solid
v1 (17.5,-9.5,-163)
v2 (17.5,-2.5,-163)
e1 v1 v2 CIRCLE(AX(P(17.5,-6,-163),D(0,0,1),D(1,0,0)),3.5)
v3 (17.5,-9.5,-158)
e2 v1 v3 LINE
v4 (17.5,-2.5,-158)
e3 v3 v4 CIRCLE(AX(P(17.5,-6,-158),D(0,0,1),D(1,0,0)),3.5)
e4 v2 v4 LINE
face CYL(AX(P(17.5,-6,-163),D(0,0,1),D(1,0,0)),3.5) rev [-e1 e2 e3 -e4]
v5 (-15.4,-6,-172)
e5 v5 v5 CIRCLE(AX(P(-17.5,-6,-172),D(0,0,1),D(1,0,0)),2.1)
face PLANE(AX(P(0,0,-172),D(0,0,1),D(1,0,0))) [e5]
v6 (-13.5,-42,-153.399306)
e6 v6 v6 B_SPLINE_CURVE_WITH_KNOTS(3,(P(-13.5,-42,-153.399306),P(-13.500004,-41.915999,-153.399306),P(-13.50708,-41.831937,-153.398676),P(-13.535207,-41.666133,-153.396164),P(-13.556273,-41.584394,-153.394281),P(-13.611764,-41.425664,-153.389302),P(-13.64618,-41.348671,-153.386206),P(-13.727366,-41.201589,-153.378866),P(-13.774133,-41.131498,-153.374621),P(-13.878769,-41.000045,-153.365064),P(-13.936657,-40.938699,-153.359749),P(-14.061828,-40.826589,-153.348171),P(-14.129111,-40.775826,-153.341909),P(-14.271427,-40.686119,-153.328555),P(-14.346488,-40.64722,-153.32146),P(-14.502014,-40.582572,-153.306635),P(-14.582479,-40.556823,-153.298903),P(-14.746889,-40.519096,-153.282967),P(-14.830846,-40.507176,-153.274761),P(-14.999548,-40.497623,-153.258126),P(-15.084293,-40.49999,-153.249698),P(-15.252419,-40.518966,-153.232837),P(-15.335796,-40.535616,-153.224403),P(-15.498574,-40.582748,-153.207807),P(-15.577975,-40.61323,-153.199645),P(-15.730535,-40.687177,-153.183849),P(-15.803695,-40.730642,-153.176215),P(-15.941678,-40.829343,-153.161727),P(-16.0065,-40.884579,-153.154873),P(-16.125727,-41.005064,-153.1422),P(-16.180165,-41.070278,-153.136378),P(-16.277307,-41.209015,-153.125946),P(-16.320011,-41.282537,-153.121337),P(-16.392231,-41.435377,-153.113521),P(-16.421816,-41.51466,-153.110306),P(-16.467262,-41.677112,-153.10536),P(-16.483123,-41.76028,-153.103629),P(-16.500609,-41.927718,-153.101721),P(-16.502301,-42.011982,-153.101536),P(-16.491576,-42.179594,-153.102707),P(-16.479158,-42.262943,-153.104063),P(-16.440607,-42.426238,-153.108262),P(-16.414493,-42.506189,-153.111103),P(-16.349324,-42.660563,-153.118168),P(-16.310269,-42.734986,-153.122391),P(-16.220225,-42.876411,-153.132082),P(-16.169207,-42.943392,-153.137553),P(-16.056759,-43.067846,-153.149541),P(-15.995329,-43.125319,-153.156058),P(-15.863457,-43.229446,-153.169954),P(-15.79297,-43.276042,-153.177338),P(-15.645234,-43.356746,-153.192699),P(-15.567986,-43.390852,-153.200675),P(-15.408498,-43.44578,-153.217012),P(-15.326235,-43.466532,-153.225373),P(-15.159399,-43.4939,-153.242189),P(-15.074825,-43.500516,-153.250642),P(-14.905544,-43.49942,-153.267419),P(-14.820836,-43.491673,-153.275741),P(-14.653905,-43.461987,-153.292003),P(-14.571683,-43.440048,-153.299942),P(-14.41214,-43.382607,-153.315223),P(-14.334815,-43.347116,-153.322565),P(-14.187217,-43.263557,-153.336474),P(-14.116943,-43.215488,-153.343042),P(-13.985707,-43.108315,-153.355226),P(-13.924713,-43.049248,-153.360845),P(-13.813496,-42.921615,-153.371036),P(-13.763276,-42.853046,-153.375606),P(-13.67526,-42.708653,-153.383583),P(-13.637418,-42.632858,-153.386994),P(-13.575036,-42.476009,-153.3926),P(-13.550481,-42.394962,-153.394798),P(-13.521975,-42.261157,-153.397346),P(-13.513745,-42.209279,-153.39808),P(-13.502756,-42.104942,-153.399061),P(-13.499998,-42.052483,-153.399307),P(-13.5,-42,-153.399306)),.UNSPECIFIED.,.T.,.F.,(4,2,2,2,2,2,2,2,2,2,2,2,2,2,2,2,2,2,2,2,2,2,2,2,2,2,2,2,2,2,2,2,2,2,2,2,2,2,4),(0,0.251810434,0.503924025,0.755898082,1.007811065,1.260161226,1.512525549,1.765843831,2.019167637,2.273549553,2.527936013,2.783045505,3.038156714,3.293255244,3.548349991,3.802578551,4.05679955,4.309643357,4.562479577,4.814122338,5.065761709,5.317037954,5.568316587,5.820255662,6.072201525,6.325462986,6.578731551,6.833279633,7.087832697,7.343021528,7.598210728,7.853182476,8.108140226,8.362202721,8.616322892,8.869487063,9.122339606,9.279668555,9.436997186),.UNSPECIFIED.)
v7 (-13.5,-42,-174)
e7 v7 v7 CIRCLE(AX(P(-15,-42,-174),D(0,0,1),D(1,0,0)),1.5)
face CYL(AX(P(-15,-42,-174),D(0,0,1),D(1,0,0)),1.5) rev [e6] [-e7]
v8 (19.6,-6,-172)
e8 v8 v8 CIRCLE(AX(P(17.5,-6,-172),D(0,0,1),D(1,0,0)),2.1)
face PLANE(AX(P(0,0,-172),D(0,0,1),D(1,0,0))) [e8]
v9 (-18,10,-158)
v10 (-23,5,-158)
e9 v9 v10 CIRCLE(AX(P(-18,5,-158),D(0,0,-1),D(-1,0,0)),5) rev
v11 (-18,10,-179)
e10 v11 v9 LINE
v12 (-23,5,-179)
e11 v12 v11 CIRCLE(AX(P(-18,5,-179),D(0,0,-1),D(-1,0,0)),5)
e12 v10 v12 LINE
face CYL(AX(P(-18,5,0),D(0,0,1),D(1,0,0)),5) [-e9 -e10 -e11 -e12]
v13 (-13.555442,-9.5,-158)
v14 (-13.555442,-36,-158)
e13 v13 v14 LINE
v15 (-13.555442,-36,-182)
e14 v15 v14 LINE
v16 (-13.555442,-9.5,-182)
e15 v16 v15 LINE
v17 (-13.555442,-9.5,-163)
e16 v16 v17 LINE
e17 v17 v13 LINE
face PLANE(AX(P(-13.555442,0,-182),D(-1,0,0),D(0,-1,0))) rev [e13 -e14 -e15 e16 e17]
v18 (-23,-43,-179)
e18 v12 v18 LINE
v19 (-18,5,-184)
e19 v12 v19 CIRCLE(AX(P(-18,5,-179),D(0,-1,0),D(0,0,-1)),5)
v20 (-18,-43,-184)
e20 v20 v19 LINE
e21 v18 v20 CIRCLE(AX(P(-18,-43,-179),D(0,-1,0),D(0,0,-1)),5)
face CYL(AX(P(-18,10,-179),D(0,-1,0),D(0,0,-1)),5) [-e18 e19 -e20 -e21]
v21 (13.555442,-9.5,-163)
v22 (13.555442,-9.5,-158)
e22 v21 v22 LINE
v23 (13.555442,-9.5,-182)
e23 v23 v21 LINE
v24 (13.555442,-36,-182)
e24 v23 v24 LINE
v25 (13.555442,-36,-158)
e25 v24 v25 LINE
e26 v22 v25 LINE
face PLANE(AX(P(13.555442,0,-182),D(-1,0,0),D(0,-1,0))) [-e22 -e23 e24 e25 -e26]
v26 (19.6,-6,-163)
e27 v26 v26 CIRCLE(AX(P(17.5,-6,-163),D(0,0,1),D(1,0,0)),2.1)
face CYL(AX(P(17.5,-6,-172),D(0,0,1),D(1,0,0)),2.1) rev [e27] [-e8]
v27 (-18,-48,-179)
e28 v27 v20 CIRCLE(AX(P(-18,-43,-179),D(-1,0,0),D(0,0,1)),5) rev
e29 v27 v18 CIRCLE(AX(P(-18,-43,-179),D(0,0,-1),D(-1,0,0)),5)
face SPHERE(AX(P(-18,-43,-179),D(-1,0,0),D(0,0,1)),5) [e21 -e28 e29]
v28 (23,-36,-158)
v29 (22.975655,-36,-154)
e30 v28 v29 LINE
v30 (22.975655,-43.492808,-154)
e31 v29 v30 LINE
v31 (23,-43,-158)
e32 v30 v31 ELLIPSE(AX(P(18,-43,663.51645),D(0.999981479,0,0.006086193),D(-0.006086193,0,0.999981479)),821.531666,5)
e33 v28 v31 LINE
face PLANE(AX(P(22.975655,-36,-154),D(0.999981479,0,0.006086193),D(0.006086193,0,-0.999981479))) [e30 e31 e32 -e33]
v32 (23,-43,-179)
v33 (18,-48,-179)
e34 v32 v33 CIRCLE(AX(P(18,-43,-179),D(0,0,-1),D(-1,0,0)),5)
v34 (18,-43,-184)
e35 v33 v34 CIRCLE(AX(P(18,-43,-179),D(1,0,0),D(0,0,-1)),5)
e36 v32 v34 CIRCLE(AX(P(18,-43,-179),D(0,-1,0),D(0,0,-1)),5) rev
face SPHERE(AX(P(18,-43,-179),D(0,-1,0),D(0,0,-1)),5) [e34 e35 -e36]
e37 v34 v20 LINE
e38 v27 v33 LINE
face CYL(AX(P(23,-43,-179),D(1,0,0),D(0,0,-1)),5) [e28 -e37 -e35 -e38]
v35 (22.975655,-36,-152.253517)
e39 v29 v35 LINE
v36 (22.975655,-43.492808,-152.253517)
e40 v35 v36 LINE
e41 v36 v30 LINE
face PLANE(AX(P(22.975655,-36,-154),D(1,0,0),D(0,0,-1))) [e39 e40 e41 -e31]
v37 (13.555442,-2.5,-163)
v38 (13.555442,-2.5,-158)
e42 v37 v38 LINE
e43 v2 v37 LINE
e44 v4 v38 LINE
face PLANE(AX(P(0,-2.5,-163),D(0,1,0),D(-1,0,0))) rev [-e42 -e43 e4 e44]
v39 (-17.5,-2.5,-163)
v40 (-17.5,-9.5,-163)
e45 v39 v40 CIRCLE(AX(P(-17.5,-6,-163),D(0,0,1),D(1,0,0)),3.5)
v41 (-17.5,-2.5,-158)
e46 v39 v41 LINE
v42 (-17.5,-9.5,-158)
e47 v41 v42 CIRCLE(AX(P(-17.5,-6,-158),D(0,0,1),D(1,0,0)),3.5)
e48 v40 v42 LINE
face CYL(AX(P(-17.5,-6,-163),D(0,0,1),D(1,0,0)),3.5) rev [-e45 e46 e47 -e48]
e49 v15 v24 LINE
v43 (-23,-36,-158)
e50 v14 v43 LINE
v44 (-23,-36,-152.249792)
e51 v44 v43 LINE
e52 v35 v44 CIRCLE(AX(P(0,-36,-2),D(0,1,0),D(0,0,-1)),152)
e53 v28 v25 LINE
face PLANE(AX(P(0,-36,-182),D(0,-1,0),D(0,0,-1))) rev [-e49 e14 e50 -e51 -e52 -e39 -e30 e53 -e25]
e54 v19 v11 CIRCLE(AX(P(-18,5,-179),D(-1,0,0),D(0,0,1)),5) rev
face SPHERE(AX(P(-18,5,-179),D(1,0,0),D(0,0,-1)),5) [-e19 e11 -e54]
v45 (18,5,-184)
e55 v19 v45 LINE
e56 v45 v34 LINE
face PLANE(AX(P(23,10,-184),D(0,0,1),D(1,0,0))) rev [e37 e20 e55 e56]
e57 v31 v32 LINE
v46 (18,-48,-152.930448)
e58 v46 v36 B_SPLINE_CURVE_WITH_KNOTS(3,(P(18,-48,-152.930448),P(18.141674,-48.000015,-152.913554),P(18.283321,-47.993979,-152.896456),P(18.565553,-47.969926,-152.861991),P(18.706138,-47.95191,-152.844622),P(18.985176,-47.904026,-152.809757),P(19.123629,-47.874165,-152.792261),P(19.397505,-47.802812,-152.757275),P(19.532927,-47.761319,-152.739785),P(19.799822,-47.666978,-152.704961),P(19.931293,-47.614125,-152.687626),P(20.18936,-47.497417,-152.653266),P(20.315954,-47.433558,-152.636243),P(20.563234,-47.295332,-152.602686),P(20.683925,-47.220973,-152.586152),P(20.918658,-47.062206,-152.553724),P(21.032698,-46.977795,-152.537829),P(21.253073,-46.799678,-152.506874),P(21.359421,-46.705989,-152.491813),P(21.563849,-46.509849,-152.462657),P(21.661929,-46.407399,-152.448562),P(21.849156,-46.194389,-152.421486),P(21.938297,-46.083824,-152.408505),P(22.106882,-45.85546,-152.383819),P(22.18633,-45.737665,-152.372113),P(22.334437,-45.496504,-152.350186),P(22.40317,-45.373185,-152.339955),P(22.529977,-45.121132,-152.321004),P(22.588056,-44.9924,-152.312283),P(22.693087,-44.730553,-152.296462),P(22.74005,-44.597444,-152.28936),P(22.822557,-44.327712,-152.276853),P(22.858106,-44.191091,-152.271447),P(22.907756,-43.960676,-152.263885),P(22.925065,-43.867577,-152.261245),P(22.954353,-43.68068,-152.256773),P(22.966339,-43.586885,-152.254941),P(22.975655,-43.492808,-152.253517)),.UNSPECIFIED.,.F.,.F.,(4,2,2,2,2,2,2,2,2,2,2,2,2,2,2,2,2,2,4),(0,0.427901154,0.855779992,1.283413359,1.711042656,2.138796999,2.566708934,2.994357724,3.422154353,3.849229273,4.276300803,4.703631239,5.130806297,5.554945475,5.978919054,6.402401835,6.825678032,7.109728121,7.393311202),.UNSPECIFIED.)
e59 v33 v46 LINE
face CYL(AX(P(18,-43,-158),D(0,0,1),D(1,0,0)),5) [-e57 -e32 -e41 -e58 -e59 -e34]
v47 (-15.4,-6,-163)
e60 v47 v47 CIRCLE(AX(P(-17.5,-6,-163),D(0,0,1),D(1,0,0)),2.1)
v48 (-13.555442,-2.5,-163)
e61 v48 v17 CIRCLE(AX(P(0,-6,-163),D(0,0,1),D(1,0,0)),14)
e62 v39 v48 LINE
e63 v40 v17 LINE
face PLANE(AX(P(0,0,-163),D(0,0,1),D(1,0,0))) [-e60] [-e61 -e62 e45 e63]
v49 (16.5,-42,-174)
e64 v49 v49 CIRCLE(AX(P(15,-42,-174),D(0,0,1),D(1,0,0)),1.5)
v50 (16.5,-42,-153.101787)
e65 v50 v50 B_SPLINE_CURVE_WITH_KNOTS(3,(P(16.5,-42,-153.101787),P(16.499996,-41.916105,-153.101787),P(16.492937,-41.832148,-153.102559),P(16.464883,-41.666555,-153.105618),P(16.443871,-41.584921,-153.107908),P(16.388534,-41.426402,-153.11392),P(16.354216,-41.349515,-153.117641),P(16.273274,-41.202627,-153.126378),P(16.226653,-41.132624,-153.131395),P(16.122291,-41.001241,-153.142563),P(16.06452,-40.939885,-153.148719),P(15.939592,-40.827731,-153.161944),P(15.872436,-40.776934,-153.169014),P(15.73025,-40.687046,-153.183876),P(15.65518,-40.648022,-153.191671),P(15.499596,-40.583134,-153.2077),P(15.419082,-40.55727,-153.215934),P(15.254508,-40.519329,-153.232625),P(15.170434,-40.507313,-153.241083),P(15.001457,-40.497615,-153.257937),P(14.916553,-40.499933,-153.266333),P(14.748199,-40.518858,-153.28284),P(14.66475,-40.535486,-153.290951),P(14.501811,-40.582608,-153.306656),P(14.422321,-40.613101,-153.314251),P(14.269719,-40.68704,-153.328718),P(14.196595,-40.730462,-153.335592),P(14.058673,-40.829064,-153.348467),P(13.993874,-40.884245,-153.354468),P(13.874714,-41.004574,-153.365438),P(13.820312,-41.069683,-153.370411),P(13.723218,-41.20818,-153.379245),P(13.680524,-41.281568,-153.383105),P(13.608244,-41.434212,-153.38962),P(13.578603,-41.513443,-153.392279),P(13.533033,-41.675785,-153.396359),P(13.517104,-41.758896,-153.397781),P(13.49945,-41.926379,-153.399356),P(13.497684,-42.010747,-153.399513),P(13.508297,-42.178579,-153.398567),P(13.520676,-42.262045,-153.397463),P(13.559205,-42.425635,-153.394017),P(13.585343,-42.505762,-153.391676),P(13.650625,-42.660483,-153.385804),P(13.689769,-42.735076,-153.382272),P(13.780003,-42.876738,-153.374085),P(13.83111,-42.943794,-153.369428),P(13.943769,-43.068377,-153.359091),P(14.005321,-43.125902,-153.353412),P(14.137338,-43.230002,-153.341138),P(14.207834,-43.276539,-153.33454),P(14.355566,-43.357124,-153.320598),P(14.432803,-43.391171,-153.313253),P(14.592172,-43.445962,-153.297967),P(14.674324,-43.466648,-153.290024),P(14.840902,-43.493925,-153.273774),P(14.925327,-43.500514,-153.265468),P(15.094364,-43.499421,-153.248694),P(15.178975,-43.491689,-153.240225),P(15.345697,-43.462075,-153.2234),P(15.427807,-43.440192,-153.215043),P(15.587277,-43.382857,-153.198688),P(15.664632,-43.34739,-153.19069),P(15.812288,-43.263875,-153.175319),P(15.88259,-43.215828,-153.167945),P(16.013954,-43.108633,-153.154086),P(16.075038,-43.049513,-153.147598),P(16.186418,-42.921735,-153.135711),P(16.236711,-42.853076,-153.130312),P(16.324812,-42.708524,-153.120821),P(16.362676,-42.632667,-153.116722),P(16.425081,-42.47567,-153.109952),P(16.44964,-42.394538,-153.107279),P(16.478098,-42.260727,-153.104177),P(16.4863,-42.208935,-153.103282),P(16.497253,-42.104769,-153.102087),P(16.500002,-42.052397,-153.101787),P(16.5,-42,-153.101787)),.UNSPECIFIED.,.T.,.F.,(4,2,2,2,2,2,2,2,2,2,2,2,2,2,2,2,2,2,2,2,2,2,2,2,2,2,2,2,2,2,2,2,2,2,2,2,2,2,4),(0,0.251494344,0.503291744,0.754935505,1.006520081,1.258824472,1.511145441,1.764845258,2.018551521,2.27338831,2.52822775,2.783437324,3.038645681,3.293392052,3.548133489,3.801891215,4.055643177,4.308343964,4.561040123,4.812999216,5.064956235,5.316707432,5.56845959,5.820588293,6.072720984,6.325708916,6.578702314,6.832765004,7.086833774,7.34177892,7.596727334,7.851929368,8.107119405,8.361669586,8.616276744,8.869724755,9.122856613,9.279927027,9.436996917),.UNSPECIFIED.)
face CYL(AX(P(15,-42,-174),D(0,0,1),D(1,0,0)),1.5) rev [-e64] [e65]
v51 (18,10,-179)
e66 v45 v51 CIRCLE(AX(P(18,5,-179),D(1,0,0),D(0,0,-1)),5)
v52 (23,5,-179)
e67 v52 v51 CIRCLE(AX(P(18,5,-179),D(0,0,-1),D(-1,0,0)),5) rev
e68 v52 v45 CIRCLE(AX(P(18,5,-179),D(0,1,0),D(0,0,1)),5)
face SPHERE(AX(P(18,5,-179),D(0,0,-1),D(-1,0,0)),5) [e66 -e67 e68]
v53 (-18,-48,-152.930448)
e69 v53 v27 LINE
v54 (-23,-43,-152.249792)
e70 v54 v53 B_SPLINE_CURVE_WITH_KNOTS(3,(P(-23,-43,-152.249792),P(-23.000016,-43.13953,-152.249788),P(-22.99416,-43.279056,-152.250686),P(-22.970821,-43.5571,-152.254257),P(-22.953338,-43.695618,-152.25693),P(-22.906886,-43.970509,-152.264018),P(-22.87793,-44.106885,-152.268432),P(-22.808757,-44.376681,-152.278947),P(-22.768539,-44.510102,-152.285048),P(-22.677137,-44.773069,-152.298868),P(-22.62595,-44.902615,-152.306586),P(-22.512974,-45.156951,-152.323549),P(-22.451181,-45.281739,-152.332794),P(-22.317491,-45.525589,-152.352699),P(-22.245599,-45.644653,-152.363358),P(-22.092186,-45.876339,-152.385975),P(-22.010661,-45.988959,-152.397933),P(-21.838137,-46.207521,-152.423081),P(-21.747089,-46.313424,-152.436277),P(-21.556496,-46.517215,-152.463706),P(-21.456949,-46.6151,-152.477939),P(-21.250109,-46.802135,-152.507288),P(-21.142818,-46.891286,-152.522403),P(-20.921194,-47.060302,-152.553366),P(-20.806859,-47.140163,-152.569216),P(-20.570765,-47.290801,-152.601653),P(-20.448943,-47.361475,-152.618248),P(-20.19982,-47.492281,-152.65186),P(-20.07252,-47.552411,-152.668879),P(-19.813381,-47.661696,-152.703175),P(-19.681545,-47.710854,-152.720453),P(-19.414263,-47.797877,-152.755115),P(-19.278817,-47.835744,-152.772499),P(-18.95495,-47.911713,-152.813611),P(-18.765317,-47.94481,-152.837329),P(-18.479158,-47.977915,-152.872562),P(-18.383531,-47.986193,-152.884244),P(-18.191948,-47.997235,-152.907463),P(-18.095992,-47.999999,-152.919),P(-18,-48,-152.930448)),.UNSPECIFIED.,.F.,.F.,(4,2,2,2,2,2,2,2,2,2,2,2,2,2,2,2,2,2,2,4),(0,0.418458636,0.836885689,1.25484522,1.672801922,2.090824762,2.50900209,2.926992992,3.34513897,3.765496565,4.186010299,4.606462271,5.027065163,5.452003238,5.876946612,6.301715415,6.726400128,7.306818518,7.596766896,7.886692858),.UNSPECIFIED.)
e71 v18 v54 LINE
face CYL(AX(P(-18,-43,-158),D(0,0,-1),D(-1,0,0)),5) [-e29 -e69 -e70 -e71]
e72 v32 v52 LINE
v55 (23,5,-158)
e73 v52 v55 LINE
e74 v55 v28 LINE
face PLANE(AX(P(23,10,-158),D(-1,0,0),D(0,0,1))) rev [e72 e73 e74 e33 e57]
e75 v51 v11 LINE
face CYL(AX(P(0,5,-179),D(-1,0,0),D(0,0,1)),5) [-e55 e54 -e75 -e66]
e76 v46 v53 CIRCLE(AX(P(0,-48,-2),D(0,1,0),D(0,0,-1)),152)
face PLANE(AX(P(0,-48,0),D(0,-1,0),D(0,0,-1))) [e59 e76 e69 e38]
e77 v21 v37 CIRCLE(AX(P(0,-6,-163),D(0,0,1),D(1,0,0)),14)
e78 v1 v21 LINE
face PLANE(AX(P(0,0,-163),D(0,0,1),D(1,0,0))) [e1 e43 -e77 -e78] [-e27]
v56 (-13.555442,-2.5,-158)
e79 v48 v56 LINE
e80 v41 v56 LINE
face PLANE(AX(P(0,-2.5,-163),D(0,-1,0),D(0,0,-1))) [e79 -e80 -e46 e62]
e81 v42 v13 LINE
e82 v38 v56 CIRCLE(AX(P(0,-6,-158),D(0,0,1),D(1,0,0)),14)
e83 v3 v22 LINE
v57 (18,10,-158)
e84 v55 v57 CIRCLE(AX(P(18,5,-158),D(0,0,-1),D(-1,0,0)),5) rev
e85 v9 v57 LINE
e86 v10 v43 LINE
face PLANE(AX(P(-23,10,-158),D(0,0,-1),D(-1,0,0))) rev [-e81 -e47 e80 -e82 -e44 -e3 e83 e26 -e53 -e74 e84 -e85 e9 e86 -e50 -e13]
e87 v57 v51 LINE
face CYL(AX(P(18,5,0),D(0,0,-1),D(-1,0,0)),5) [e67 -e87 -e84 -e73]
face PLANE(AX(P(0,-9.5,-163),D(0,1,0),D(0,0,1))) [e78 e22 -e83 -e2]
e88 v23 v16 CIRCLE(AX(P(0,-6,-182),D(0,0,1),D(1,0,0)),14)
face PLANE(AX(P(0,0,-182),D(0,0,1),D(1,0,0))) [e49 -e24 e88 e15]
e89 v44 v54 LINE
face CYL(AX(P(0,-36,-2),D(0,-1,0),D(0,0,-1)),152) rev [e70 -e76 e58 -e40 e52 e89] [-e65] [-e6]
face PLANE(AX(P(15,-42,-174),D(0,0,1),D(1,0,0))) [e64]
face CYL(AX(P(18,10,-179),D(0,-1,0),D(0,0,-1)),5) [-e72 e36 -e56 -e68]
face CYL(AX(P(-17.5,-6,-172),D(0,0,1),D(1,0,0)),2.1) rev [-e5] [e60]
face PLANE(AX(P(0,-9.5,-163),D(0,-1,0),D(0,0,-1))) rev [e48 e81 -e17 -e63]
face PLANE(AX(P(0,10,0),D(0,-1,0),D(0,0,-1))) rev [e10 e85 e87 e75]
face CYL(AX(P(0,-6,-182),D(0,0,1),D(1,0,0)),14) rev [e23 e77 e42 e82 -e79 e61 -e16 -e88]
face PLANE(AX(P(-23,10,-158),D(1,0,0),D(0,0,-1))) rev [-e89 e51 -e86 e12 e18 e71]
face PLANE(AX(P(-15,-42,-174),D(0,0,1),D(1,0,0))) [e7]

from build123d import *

# Parameters (mm, degrees)
ESQUISSE1_W             = 26
ESQUISSE1_H             = 46
BOSS_EXTRU_1_DEPTH      = 10
ESQUISSE1_5_W           = 26
ESQUISSE1_5_H           = 46
BOSS_EXTRU_2_DEPTH      = 48
ESQUISSE2_R             = 14
ESQUISSE2_R_2           = 2.5
ENL_V_MAT_EXTRU_1_DEPTH = 24
ESQUISSE2_17_R          = 2.1
ENL_V_MAT_EXTRU_2_DEPTH = 5
ESQUISSE2_18_R          = 2.1
ENL_V_MAT_EXTRU_3_DEPTH = 14
BOSS_EXTRU_7_DEPTH      = 12
CONG_1_R                = 5
CONG_2_R                = 5
ESQUISSE6_R             = 1.5
ENL_V_MAT_EXTRU_4_DEPTH = 174


with BuildPart() as part:
    # Esquisse1 → Boss.-Extru.1 (new body)
    with BuildSketch(Plane(origin=(0, 0, 0), x_dir=(0, 0, -1), z_dir=(0, 1, 0))):
        with Locations((171, 0)):
            Rectangle(ESQUISSE1_W, ESQUISSE1_H)
    extrude(amount=BOSS_EXTRU_1_DEPTH)

    # Esquisse1<5> → Boss.-Extru.2 (add)
    with BuildSketch(Plane(origin=(0, 0, 0), x_dir=(0, 0, -1), z_dir=(0, 1, 0))):
        with Locations((171, 0)):
            Rectangle(ESQUISSE1_5_W, ESQUISSE1_5_H)
    extrude(amount=-BOSS_EXTRU_2_DEPTH)

    # Esquisse2 → Enlèv. mat.-Extru.1 (cut)
    # profile 1 of 3: a face of its own
    with BuildSketch(Plane.XY.offset(-158)):
        with Locations((0, -6)):
            Circle(ESQUISSE2_R)
        with Locations((0, 2)):
            Circle(ESQUISSE2_R_2, mode=Mode.SUBTRACT)
    # profile 2 of 3: a face of its own
    with BuildSketch(Plane.XY.offset(-158)):
        with BuildLine():
            ThreePointArc((13.555441712, -9.5), (0, -20), (-13.555441712, -9.5))
            Line((-13.555441712, -9.5), (-13.555441712, -36))
            Line((-13.555441712, -36), (13.555441712, -36))
            Line((13.555441712, -36), (13.555441712, -9.5))
        make_face()
    # profile 3 of 3: a face of its own
    with BuildSketch(Plane.XY.offset(-158)):
        with Locations((0, 2)):
            Circle(ESQUISSE2_R_2)
    extrude(amount=-ENL_V_MAT_EXTRU_1_DEPTH, mode=Mode.SUBTRACT)

    # Esquisse2<17> → Enlèv. mat.-Extru.2 (cut)
    # profile 1 of 2: a face of its own
    with BuildSketch(Plane.XY.offset(-158)):
        with BuildLine():
            Line((-13.555441712, -2.5), (-17.5, -2.5))
            ThreePointArc((-17.5, -2.5), (-21, -6), (-17.5, -9.5))
            Line((-17.5, -9.5), (-13.555441712, -9.5))
            ThreePointArc((-13.555441712, -9.5), (-14, -6), (-13.555441712, -2.5))
        make_face()
        with Locations((-17.5, -6)):
            Circle(ESQUISSE2_17_R, mode=Mode.SUBTRACT)
    # profile 2 of 2: a face of its own
    with BuildSketch(Plane.XY.offset(-158)):
        with BuildLine():
            Line((17.5, -2.5), (13.555441712, -2.5))
            ThreePointArc((13.555441712, -2.5), (13.888415748, -4.235939905), (14, -6))
            ThreePointArc((14, -6), (13.888415748, -7.764060095), (13.555441712, -9.5))
            Line((13.555441712, -9.5), (17.5, -9.5))
            ThreePointArc((17.5, -9.5), (21, -6), (17.5, -2.5))
        make_face()
        with Locations((17.5, -6)):
            Circle(ESQUISSE2_17_R, mode=Mode.SUBTRACT)
    extrude(amount=-ENL_V_MAT_EXTRU_2_DEPTH, mode=Mode.SUBTRACT)

    # Esquisse2<18> → Enlèv. mat.-Extru.3 (cut)
    with BuildSketch(Plane.XY.offset(-158)):
        with Locations((-17.5, -6)):
            Circle(ESQUISSE2_18_R)
        with Locations((17.5, -6)):
            Circle(ESQUISSE2_18_R)
    extrude(amount=-ENL_V_MAT_EXTRU_3_DEPTH, mode=Mode.SUBTRACT)

    # Esquisse5 → Boss.-Extru.7 (add)
    with BuildSketch(Plane.XZ.offset(48)):
        with BuildLine():
            Line((-23, -158), (-23, -154))
            Line((-23, -154), (-23, -152.249792013))
            ThreePointArc((-23, -152.249792013), (-0.012314253, -153.999999501), (22.975654778, -152.253516723))
            Line((22.975654778, -152.253516723), (22.975654778, -154))
            Line((22.975654778, -154), (23, -158))
            Line((23, -158), (23, -184))
            Line((23, -184), (-23, -184))
            Line((-23, -184), (-23, -158))
        make_face()
    extrude(amount=-BOSS_EXTRU_7_DEPTH)

    # Congé1
    cong_1_edges = [part.edges().sort_by_distance(p)[0] for p in [
        (23, 10, -171),
        (0, 10, -184),
        (23, -19, -184),
    ]]
    fillet(cong_1_edges, radius=CONG_1_R)

    # Congé2
    # the kernel refuses this fillet: 5 mm, written as the material it takes off along each edge
    with BuildSketch(Plane(origin=(-18, -43, -179), x_dir=(-1, 0, 0), z_dir=(0, -1, 0))) as cong_2_piece_1_section:
        Polygon((0, 0), (CONG_2_R * 1.02, 0), (CONG_2_R * 1.02, CONG_2_R * 1.02), (0, CONG_2_R * 1.02), align=None)
    cong_2_piece_1 = extrude(amount=CONG_2_R * 1.02, mode=Mode.PRIVATE)
    cong_2_piece_1 = cong_2_piece_1 - Plane(origin=(-18, -43, -179), x_dir=(0.7071067811865475, 0, 0.7071067811865475), z_dir=(0, -1, 0)) * Sphere(CONG_2_R, mode=Mode.PRIVATE)
    add(cong_2_piece_1, mode=Mode.SUBTRACT)
    with BuildSketch(Plane(origin=(18, -48, -179), x_dir=(0, 0, -1), z_dir=(-1, 0, 0))) as cong_2_piece_2:
        with BuildLine():
            CenterArc((5 - CONG_2_R, -CONG_2_R), CONG_2_R, 0, 90)
            Line((5 - CONG_2_R, 0), (5, 0))
            Line((5, 0), (5, -CONG_2_R))
        make_face()
    revolve(axis=Axis((18, -48, -179), (0, -1, 0)), revolution_arc=90, mode=Mode.SUBTRACT)
    with BuildSketch(Plane(origin=(-23, 5, -179), x_dir=(0, 1, 0), z_dir=(0, 0, 1))) as cong_2_piece_3:
        with BuildLine():
            CenterArc((5 - CONG_2_R, -CONG_2_R), CONG_2_R, 0, 90)
            Line((5, -CONG_2_R), (5, 0))
            Line((5, 0), (5 - CONG_2_R, 0))
        make_face()
    revolve(axis=Axis((-23, 5, -179), (-1, 0, 0)), revolution_arc=90, mode=Mode.SUBTRACT)
    with BuildSketch(Plane(origin=(-23, -48, -179), x_dir=(0, 1, 0), z_dir=(0, 0, 1))) as cong_2_piece_4:
        with BuildLine():
            CenterArc((CONG_2_R, -CONG_2_R), CONG_2_R, 90, 90)
            Line((0, -CONG_2_R), (0, 0))
            Line((0, 0), (CONG_2_R, 0))
        make_face()
    extrude(amount=39.250207987, mode=Mode.SUBTRACT)
    with BuildSketch(Plane(origin=(23, -48, -145.5), x_dir=(0, 1, 0), z_dir=(0, 0, -1)), Plane(origin=(-23, 10, -179), x_dir=(1, 0, 0), z_dir=(0, 0, 1))) as cong_2_piece_5:
        with BuildLine():
            CenterArc((CONG_2_R, -CONG_2_R), CONG_2_R, 90, 90)
            Line((0, -CONG_2_R), (0, 0))
            Line((0, 0), (CONG_2_R, 0))
        make_face()
    extrude(amount=33.5, mode=Mode.SUBTRACT)
    with BuildSketch(Plane(origin=(18, -48, -184), x_dir=(0, 0, 1), z_dir=(-1, 0, 0))) as cong_2_piece_6:
        with BuildLine():
            CenterArc((CONG_2_R, CONG_2_R), CONG_2_R, 180, 90)
            Line((0, CONG_2_R), (0, 0))
            Line((0, 0), (CONG_2_R, 0))
        make_face()
    extrude(amount=36, mode=Mode.SUBTRACT)
    with BuildSketch(Plane(origin=(-23, 5, -184), x_dir=(0, 0, 1), z_dir=(0, -1, 0))) as cong_2_piece_7:
        with BuildLine():
            CenterArc((CONG_2_R, -CONG_2_R), CONG_2_R, 90, 90)
            Line((0, -CONG_2_R), (0, 0))
            Line((0, 0), (CONG_2_R, 0))
        make_face()
    extrude(amount=48, mode=Mode.SUBTRACT)

    # Esquisse6 → Enlèv. mat.-Extru.4 (cut)
    with BuildSketch(Plane.XY):
        with Locations((-15, -42)):
            Circle(ESQUISSE6_R)
        with Locations((15, -42)):
            Circle(ESQUISSE6_R)
    extrude(amount=-ENL_V_MAT_EXTRU_4_DEPTH, mode=Mode.SUBTRACT)


solid = part.part
